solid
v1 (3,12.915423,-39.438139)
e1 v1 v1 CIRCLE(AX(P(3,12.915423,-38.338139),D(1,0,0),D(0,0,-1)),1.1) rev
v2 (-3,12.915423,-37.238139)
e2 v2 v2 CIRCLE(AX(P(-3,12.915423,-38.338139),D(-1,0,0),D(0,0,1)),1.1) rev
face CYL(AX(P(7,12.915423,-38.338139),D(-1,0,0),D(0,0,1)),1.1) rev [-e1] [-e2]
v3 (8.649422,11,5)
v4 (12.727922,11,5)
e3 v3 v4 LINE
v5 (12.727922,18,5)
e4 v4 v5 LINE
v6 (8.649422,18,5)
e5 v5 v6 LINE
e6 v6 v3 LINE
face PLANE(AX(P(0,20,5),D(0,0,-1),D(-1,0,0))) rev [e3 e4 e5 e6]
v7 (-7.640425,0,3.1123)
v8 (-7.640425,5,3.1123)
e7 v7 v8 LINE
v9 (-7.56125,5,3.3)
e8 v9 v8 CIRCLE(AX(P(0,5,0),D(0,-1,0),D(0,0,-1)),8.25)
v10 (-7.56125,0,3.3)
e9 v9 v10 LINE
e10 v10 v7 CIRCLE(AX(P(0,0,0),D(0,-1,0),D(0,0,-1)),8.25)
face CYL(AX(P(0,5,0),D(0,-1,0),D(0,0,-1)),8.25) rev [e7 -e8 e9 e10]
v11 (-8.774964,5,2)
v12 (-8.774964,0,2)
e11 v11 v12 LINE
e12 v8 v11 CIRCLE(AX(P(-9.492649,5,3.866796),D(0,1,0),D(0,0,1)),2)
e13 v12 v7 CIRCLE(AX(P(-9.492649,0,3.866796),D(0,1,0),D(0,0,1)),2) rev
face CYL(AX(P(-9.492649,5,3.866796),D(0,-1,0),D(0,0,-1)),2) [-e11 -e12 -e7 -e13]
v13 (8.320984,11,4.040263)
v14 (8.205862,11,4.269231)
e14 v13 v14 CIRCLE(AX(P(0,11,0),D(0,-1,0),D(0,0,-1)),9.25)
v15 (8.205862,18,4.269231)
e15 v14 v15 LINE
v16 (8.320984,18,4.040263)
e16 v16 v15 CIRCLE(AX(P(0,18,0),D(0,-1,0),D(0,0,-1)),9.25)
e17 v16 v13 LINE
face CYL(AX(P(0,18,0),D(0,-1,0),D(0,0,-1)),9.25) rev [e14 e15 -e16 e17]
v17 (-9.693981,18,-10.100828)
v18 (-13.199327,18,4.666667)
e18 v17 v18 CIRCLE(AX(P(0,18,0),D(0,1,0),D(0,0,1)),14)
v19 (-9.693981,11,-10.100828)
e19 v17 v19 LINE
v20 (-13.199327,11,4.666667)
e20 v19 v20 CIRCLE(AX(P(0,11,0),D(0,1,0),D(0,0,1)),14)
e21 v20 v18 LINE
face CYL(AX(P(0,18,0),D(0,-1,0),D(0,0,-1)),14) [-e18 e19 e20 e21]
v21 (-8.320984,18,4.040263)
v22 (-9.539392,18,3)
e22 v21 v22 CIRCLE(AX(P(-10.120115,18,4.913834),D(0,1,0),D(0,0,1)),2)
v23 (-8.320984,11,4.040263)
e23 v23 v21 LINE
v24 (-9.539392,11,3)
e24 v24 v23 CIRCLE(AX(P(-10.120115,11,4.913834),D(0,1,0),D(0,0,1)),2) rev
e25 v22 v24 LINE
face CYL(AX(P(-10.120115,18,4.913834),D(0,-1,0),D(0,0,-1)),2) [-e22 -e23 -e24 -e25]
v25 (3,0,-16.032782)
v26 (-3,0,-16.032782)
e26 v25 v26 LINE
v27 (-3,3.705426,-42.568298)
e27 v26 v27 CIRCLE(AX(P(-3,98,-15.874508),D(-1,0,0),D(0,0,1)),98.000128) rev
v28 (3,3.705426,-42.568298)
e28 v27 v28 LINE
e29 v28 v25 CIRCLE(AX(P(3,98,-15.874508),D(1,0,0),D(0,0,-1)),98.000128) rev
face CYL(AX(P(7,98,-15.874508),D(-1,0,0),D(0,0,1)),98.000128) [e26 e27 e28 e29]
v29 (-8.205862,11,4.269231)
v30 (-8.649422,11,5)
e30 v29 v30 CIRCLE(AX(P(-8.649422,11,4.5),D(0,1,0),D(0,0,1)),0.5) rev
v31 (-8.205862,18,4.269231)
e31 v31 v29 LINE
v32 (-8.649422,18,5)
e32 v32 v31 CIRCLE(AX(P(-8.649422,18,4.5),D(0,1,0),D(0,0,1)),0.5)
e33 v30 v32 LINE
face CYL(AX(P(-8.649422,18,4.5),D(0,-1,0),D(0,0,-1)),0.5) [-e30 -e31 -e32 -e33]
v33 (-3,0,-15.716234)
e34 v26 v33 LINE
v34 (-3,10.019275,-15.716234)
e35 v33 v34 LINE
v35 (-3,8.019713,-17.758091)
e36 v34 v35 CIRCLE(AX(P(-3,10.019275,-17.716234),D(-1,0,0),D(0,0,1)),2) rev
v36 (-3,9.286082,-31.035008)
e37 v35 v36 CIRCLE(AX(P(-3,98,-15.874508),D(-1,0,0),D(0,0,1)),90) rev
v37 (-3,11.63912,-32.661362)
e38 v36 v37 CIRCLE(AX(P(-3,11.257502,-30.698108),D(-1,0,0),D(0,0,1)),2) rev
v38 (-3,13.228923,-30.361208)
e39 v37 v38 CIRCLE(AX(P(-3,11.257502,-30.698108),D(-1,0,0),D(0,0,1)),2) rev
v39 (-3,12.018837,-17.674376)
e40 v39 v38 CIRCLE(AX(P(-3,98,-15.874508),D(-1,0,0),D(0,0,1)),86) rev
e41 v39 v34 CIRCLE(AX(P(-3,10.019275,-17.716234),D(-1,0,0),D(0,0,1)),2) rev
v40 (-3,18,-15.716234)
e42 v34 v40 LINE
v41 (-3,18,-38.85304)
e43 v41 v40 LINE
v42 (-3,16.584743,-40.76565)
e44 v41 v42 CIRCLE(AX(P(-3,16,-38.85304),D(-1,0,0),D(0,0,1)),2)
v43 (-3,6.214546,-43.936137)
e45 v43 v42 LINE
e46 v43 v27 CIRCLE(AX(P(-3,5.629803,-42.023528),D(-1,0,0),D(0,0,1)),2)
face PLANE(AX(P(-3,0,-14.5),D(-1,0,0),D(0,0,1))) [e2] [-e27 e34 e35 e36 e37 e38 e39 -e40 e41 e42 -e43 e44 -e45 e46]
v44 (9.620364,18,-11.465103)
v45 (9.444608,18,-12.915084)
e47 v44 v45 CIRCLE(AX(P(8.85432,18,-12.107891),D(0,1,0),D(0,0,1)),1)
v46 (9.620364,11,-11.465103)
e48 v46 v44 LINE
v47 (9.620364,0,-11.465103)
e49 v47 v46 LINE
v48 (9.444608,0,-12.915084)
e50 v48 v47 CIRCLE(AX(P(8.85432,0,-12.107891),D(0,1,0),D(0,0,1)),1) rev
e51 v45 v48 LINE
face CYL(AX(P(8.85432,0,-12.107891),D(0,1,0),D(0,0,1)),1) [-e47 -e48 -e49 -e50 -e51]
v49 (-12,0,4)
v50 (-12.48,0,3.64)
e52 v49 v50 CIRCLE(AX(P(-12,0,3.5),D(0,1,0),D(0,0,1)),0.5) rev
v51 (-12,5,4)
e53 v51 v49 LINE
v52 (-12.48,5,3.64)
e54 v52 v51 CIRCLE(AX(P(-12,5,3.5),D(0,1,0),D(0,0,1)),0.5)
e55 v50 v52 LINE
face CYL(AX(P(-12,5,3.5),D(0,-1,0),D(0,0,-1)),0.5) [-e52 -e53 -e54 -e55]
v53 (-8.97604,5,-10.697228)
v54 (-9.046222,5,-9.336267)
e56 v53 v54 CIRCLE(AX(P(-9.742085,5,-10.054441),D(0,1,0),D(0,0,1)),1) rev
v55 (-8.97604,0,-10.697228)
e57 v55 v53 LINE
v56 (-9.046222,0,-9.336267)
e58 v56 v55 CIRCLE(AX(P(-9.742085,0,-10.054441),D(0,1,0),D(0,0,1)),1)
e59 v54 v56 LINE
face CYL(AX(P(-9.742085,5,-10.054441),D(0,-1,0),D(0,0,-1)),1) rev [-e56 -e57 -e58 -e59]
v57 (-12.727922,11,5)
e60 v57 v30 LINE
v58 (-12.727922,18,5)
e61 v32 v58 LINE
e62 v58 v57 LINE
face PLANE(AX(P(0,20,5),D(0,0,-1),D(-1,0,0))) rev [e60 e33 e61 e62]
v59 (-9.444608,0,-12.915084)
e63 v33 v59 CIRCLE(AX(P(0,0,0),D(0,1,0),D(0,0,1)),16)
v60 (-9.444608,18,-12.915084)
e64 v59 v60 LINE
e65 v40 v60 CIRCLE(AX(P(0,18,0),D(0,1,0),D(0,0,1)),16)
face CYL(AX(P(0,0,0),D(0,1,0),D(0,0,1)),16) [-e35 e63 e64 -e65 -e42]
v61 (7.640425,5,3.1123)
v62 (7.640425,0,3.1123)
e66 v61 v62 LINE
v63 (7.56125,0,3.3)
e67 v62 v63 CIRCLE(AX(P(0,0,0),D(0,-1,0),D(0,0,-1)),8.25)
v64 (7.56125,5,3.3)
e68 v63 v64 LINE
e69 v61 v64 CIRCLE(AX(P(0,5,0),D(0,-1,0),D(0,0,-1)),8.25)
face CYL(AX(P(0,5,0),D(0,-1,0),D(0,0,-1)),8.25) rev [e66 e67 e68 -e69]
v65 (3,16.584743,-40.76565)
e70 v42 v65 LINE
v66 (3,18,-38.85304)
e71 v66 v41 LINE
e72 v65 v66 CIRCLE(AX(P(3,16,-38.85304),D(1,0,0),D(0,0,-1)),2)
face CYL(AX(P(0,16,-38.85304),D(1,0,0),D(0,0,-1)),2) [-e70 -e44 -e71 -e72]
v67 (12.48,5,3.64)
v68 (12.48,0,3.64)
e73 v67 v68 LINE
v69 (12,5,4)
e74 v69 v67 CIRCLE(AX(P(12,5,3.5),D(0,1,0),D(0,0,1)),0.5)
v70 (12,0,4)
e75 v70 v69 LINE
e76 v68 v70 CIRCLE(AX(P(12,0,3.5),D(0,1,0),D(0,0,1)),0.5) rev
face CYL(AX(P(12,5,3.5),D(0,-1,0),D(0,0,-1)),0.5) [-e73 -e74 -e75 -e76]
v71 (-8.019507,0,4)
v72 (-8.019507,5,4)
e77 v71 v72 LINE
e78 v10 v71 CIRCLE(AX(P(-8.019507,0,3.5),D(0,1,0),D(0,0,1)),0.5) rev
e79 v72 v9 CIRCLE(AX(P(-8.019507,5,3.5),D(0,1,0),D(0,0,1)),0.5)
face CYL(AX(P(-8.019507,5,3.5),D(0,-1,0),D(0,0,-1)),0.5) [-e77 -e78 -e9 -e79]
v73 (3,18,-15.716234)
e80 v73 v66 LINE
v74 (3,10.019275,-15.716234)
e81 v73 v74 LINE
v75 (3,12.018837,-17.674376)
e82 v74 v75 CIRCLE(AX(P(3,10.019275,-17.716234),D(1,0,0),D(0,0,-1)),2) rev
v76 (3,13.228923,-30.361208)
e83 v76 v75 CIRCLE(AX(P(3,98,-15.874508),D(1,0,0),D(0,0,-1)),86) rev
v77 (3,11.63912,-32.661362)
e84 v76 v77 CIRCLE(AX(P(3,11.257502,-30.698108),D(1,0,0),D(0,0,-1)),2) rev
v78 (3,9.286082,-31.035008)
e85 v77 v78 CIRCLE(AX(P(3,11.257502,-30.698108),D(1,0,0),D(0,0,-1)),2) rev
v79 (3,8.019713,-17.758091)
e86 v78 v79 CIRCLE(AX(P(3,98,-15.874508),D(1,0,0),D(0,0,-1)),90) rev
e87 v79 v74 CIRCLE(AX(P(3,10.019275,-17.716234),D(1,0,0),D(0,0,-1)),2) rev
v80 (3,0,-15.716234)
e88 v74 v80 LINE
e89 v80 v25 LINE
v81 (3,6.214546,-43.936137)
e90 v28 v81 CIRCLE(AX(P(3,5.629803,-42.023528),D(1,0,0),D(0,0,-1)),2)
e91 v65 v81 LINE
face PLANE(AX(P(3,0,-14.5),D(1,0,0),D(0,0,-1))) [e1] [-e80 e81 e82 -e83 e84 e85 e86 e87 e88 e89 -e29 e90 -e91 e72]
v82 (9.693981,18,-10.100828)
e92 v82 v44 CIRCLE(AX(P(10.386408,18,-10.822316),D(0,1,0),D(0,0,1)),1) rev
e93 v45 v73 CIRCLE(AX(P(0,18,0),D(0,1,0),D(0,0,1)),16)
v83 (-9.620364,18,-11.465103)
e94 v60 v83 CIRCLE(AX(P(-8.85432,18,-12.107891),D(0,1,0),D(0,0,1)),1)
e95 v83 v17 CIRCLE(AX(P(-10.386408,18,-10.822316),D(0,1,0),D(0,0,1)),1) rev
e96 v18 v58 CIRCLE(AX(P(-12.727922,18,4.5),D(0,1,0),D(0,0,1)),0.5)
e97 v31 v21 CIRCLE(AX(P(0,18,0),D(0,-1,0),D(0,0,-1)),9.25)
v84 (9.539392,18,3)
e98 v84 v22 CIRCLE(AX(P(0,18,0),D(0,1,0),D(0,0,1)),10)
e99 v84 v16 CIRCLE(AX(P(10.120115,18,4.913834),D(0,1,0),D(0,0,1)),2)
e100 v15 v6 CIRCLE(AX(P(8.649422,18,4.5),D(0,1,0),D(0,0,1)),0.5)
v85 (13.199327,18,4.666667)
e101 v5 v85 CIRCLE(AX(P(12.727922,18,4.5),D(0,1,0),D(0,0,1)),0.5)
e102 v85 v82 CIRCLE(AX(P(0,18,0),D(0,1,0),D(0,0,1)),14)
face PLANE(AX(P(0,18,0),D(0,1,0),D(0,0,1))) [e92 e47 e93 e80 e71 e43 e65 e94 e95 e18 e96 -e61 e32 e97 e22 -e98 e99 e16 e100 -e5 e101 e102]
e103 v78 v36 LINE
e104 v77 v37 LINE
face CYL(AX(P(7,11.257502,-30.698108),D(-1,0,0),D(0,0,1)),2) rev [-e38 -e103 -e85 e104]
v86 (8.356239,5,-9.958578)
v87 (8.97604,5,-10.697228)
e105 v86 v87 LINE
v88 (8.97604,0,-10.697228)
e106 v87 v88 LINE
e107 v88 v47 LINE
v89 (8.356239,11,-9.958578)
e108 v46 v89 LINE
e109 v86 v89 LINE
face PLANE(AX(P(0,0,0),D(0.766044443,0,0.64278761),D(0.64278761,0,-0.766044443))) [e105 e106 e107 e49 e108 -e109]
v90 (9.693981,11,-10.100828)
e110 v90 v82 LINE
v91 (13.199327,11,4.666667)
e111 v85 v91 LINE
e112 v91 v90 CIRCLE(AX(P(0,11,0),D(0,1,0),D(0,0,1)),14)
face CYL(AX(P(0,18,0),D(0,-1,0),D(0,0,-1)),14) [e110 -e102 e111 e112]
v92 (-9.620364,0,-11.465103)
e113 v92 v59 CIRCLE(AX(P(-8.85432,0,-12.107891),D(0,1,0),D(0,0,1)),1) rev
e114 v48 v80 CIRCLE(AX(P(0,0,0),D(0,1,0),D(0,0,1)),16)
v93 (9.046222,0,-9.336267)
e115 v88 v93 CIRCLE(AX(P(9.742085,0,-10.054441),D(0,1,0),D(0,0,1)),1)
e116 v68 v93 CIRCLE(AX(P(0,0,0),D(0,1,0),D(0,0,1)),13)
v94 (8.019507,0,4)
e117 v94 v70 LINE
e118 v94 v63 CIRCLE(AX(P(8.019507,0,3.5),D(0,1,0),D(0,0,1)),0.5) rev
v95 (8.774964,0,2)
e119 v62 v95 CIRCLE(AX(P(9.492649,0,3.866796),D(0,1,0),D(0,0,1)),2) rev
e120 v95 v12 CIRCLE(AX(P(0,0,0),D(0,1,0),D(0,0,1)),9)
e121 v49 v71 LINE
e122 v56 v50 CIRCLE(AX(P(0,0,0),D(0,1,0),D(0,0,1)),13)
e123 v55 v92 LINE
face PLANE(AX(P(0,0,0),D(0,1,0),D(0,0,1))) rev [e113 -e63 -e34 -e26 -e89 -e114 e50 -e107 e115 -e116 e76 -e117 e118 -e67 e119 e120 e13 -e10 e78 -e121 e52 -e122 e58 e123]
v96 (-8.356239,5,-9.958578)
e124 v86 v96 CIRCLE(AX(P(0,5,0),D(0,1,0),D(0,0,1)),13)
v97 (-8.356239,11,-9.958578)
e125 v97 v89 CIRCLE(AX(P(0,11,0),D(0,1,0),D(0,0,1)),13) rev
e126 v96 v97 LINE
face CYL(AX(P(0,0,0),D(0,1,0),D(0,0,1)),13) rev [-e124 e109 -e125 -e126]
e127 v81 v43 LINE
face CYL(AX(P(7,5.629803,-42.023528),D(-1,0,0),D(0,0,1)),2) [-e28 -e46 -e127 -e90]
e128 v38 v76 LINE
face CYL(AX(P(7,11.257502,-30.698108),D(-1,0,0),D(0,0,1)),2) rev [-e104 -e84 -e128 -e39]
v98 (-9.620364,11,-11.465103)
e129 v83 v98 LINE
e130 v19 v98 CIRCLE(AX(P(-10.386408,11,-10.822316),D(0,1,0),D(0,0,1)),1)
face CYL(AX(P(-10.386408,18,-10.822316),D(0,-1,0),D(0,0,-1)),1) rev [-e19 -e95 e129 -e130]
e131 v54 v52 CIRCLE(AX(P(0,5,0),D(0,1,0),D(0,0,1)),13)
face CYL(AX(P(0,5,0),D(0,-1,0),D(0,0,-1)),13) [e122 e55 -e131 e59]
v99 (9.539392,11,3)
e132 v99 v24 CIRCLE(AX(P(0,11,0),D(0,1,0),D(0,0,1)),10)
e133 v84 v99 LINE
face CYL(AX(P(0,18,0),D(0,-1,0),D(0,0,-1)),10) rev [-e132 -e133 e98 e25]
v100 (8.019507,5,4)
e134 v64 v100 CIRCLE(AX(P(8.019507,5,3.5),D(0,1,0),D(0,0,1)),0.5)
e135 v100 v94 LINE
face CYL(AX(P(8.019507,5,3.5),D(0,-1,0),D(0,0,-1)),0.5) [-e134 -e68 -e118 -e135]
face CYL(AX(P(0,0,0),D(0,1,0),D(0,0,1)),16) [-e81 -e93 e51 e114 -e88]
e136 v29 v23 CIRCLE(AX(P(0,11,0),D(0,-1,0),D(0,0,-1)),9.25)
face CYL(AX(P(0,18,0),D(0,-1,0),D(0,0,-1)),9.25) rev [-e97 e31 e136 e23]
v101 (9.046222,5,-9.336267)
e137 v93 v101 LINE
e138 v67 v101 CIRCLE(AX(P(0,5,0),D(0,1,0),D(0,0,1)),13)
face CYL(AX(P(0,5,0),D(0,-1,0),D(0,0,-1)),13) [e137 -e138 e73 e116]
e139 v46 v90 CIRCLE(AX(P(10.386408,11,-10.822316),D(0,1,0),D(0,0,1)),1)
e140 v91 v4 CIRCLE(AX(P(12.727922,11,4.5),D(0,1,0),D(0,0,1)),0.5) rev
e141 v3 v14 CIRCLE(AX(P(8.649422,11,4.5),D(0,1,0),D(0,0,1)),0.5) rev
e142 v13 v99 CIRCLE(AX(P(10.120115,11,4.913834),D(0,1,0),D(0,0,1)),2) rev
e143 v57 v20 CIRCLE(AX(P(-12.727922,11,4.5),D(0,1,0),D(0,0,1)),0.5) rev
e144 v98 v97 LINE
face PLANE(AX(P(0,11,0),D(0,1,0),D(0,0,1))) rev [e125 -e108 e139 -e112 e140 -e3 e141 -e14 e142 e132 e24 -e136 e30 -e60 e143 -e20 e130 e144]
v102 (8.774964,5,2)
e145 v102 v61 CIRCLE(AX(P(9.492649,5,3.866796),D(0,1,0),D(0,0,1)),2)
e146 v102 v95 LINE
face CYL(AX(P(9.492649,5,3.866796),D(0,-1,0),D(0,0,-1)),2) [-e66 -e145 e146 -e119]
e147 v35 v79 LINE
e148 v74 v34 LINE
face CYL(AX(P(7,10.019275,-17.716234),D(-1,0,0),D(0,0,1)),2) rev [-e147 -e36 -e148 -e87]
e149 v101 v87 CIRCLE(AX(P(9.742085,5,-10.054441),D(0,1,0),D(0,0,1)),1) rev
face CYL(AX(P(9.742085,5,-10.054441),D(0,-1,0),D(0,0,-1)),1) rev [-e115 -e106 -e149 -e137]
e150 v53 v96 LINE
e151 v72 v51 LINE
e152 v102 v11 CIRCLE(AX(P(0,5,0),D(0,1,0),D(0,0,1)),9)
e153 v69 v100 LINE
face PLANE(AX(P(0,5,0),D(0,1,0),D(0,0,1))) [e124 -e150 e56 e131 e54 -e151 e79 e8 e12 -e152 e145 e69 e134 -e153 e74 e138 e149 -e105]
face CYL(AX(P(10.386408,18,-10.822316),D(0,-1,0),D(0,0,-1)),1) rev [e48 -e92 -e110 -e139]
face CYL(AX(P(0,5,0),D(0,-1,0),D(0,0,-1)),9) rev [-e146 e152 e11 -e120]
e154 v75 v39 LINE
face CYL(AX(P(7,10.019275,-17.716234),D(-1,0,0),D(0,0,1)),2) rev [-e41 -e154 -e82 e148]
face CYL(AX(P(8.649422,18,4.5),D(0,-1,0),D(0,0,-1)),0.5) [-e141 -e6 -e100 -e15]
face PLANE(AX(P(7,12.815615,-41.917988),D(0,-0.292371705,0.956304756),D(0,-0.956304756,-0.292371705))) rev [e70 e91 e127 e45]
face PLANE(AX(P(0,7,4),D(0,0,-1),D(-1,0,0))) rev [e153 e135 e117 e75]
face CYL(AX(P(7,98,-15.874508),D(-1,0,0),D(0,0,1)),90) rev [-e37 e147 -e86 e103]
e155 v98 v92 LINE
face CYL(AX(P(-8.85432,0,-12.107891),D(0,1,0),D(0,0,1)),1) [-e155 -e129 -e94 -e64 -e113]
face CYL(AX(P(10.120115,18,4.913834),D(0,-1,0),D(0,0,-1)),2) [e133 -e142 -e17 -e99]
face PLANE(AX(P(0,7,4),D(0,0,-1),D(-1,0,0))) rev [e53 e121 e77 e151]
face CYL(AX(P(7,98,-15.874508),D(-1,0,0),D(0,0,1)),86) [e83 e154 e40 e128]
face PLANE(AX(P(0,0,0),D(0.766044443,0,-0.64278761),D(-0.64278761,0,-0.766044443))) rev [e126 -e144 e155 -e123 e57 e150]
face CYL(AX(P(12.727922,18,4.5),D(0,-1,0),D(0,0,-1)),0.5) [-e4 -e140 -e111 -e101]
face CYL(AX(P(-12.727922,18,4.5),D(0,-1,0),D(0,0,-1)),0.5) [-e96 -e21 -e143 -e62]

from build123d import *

# Parameters (mm, degrees)
SKETCH1_R              = 13
SKETCH1_R_2            = 9
BOSS_EXTRUDE1_DEPTH    = 5
SKETCH2_R              = 14
SKETCH2_R_2            = 10
BOSS_EXTRUDE2_DEPTH    = 7
CUT_EXTRUDE1_DEPTH     = 7
BOSS_EXTRUDE3_DEPTH    = 5
FILLET1_R              = 2
FILLET2_R              = 0.5
CUT_EXTRUDE2_DEPTH     = 9
BOSS_EXTRUDE4_DEPTH    = 7
FILLET3_R              = 2
FILLET4_R              = 0.5
BOSS_EXTRUDE5_START    = -18
BOSS_EXTRUDE5_DEPTH    = 18
BOSS_EXTRUDE6_START    = -18
BOSS_EXTRUDE6_DEPTH    = 18
SKETCH7_W              = 6
SKETCH7_H              = 18
BOSS_EXTRUDE7_DEPTH    = 28
FILLET5_R              = 1
CUT_EXTRUDE3_START     = -6
CUT_EXTRUDE3_OUTLINE_R = 1.1
CUT_EXTRUDE3_DEPTH     = 6
FILLET7_R              = 2


# Read off the part's stored shape, not the designer's step: Boss-Extrude6, Cut-Extrude3
# Some blends are built 0.0001 mm under size
with BuildPart() as part:
    # Sketch1 → Boss-Extrude1 (new body)
    with BuildSketch(Plane(origin=(0, 0, 0), x_dir=(1, 0, 0), z_dir=(0, 1, 0))):
        with Locations(Location((0, 0, 0), (0, 0, 270))):
            Circle(SKETCH1_R)
        with Locations(Location((0, 0, 0), (0, 0, 270))):
            Circle(SKETCH1_R_2, mode=Mode.SUBTRACT)
    extrude(amount=BOSS_EXTRUDE1_DEPTH)

    # Sketch3 → Cut-Extrude1 (cut)
    with BuildSketch(Plane.XZ):
        with BuildLine():
            ThreePointArc((12.369316877, 4), (0, 13), (-12.369316877, 4))
            Line((-12.369316877, 4), (-8.062257748, 4))
            ThreePointArc((-8.062257748, 4), (0, 9), (8.062257748, 4))
            Line((8.062257748, 4), (12.369316877, 4))
        make_face()
    extrude(amount=-CUT_EXTRUDE1_DEPTH, mode=Mode.SUBTRACT)

    # Sketch3<3> → Boss-Extrude3 (add)
    with BuildSketch(Plane.XZ):
        with BuildLine():
            Line((-7.215434845, 4), (-8.062257748, 4))
            ThreePointArc((-8.062257748, 4), (-8.477795251, 3.02109048), (-8.774964387, 2))
            Line((-8.774964387, 2), (-8.003905297, 2))
            ThreePointArc((-8.003905297, 2), (-7.675094696, 3.025792692), (-7.215434845, 4))
        make_face()
        with BuildLine():
            ThreePointArc((8.774964387, 2), (8.477795251, 3.02109048), (8.062257748, 4))
            Line((8.062257748, 4), (7.215434845, 4))
            ThreePointArc((7.215434845, 4), (7.675094696, 3.025792692), (8.003905297, 2))
            Line((8.003905297, 2), (8.774964387, 2))
        make_face()
    extrude(amount=-BOSS_EXTRUDE3_DEPTH)

    # Fillet1
    # the kernel refuses this fillet: 2 mm, written as the material it takes off along each edge
    with BuildSketch(Plane(origin=(8.003905297, -2.925457541, 2), x_dir=(-0.3106184744402921, 0, 0.9505346723483502), z_dir=(0, 1, 0))) as fillet1_piece_1:
        with BuildLine():
            CenterArc((1.312023382, 1.994963987), FILLET1_R, 219.12562277, 46.807536055)
            Line((-0.239505198, 0.7329184), (-0.27053577, 0.707677488))
            ThreePointArc((-0.27053577, 0.707677488), (-0.157773986, 0.354034461), (-0.038021387, -0.012424739))
            Line((-0.038021387, -0.012424739), (0.002836807, -0.03989928))
            ThreePointArc((0.002836807, -0.03989928), (0.585091508, -0.019226448), (1.167346209, -0.03989928))
            Line((1.167346209, -0.03989928), (1.170183016, 0))
        make_face()
    extrude(amount=10.850915082, mode=Mode.SUBTRACT)
    with BuildSketch(Plane(origin=(-8.003905297, -2.925457541, 2), x_dir=(-1, 0, 0), z_dir=(0, 1, 0))) as fillet1_piece_2:
        with BuildLine():
            CenterArc((1.488743739, 1.866796386), FILLET1_R, 202.16334775, 46.807536055)
            Line((-0.363480463, 1.11229953), (-0.400524947, 1.097209593))
            ThreePointArc((-0.400524947, 1.097209593), (-0.200015637, 0.550177675), (-0.038806814, -0.00969697))
            Line((-0.038806814, -0.00969697), (0, -0.04))
            ThreePointArc((0, -0.04), (0.385529545, -0.04), (0.756705398, -0.037335928))
            Line((0.756705398, -0.037335928), (0.771059091, 0))
        make_face()
    extrude(amount=10.850915082, mode=Mode.SUBTRACT)

    # Fillet2
    fillet2_edges = [part.edges().sort_by_distance(p)[0] for p in [
        (-12.369316877, 2.5, 4),
        (12.369316877, 2.5, 4),
        (-7.215434845, 2.5, 4),
        (7.215434845, 2.5, 4),
    ]]
    fillet(fillet2_edges, radius=FILLET2_R)



with BuildPart() as body_2:
    # Sketch2 → Boss-Extrude2 (new body)
    with BuildSketch(Plane(origin=(0, 11, 0), x_dir=(1, 0, 0), z_dir=(0, 1, 0))):
        with Locations(Location((0, 0, 0), (0, 0, 270))):
            Circle(SKETCH2_R)
        with Locations(Location((0, 0, 0), (0, 0, 270))):
            Circle(SKETCH2_R_2, mode=Mode.SUBTRACT)
    extrude(amount=BOSS_EXTRUDE2_DEPTH)

    # Sketch4 → Cut-Extrude2 (cut)
    with BuildSketch(Plane.XZ.offset(-11)):
        with BuildLine():
            ThreePointArc((13.076696831, 5), (0, 14), (-13.076696831, 5))
            Line((-13.076696831, 5), (-8.660254038, 5))
            ThreePointArc((-8.660254038, 5), (0, 10), (8.660254038, 5))
            Line((8.660254038, 5), (13.076696831, 5))
        make_face()
    extrude(amount=-CUT_EXTRUDE2_DEPTH, mode=Mode.SUBTRACT)

    # Sketch4<3> → Boss-Extrude4 (add)
    with BuildSketch(Plane.XZ.offset(-11)):
        with BuildLine():
            Line((-7.782191208, 5), (-8.660254038, 5))
            ThreePointArc((-8.660254038, 5), (-9.154604257, 4.02408013), (-9.539392014, 3))
            Line((-9.539392014, 3), (-8.75, 3))
            ThreePointArc((-8.75, 3), (-8.326363944, 4.029164115), (-7.782191208, 5))
        make_face()
        with BuildLine():
            ThreePointArc((9.539392014, 3), (9.154604257, 4.02408013), (8.660254038, 5))
            Line((8.660254038, 5), (7.782191208, 5))
            ThreePointArc((7.782191208, 5), (8.326363944, 4.029164115), (8.75, 3))
            Line((8.75, 3), (9.539392014, 3))
        make_face()
    extrude(amount=-BOSS_EXTRUDE4_DEPTH)

    # Fillet3
    # the kernel refuses this fillet: 2 mm, written as the material it takes off along each edge
    with BuildSketch(Plane(origin=(-8.75, 8.186857883, 3), x_dir=(-1, 0, 0), z_dir=(0, 1, 0))) as fillet3_piece_1:
        with BuildLine():
            CenterArc((1.370115418, 1.913833934), FILLET3_R, 205.898945897, 47.221442291)
            Line((-0.429016212, 1.040263457), (-0.464998845, 1.022792048))
            ThreePointArc((-0.464998845, 1.022792048), (-0.235653724, 0.511411041), (-0.037837838, -0.012972973))
            Line((-0.037837838, -0.012972973), (0, -0.04))
            ThreePointArc((0, -0.04), (0.394696007, -0.04), (0.777777546, -0.038276679))
            Line((0.777777546, -0.038276679), (0.789392014, 0))
        make_face()
    extrude(amount=12.626284233, mode=Mode.SUBTRACT)
    with BuildSketch(Plane(origin=(8.75, 8.186857883, 3), x_dir=(-0.3812606993131178, 0, 0.9244675652283711), z_dir=(0, 1, 0))) as fillet3_piece_2:
        with BuildLine():
            CenterArc((1.246906235, 1.996296928), FILLET3_R, 219.291406968, 47.221442291)
            Line((-0.300964151, 0.729767313), (-0.331921559, 0.704436721))
            ThreePointArc((-0.331921559, 0.704436721), (-0.187460778, 0.349633229), (-0.036978703, -0.015250428))
            Line((-0.036978703, -0.015250428), (0.002432988, -0.039925939))
            ThreePointArc((0.002432988, -0.039925939), (0.562628423, -0.022873294), (1.122823859, -0.039925939))
            Line((1.122823859, -0.039925939), (1.125256847, 0))
        make_face()
    extrude(amount=12.626284233, mode=Mode.SUBTRACT)

    # Fillet4
    fillet4_edges = [body_2.edges().sort_by_distance(p)[0] for p in [
        (-13.076696831, 14.5, 5),
        (13.076696831, 14.5, 5),
        (-7.782191208, 14.5, 5),
        (7.782191208, 14.5, 5),
    ]]
    fillet(fillet4_edges, radius=FILLET4_R)


with BuildPart() as part_1:
    add(part.part)

    add(body_2.part)  # Boss-Extrude5 merges body 2
    # Sketch5 → Boss-Extrude5 (add)
    with BuildSketch(Plane(origin=(0, 18, 0), x_dir=(1, 0, 0), z_dir=(0, 1, 0)).offset(BOSS_EXTRUDE5_START)):
        with BuildLine():
            ThreePointArc((0, 14), (4.788282007, 13.155696691), (8.999026536, 10.724622204))
            Line((8.999026536, 10.724622204), (10.284601755, 12.25671109))
            ThreePointArc((10.284601755, 12.25671109), (0, 16), (-10.284601755, 12.25671109))
            Line((-10.284601755, 12.25671109), (-8.999026536, 10.724622204))
            ThreePointArc((-8.999026536, 10.724622204), (-4.788282007, 13.155696691), (0, 14))
        make_face()
        with BuildLine():
            ThreePointArc((0, 13), (4.446261863, 12.21600407), (8.356238926, 9.958577761))
            Line((8.356238926, 9.958577761), (8.999026536, 10.724622204))
            ThreePointArc((8.999026536, 10.724622204), (4.788282007, 13.155696691), (0, 14))
            Line((0, 14), (0, 13))
        make_face()
        with BuildLine():
            Line((-8.999026536, 10.724622204), (-8.356238926, 9.958577761))
            ThreePointArc((-8.356238926, 9.958577761), (-4.446261863, 12.21600407), (0, 13))
            Line((0, 13), (0, 14))
            ThreePointArc((0, 14), (-4.788282007, 13.155696691), (-8.999026536, 10.724622204))
        make_face()
    extrude(amount=BOSS_EXTRUDE5_DEPTH)

    # Boss-Extrude6 outline → Boss-Extrude6 (add)
    with BuildSketch(Plane(origin=(0, 18, 0), x_dir=(1, 0, 0), z_dir=(0, 1, 0)).offset(BOSS_EXTRUDE6_START)):
        with BuildLine():
            ThreePointArc((-3, 15.716233646), (0, 16), (3, 15.716233646))
            Line((3, 15.716233646), (3, 17.5))
            Line((3, 17.5), (-3, 17.5))
            Line((-3, 17.5), (-3, 15.716233646))
        make_face()
    extrude(amount=BOSS_EXTRUDE6_DEPTH)

    # Sketch7 → Boss-Extrude7 (add)
    with BuildSketch(Plane(origin=(0, 0, -17.5), x_dir=(-1, 0, 0), z_dir=(0, 0, -1))):
        with Locations((0, 9)):
            Rectangle(SKETCH7_W, SKETCH7_H)
    extrude(amount=BOSS_EXTRUDE7_DEPTH)

    # Fillet5
    fillet5_edges = [part_1.edges().sort_by_distance(p)[0] for p in [
        (-8.356238926, 2.5, -9.958577761),
        (-8.999026536, 14.5, -10.724622204),
        (8.356238926, 2.5, -9.958577761),
        (8.999026536, 14.5, -10.724622204),
        (10.284601755, 9, -12.25671109),
        (-10.284601755, 9, -12.25671109),
    ]]
    fillet(fillet5_edges, radius=FILLET5_R - 0.0001)  # a hair under: the kernel refuses the full size

    # Cut-Extrude3 outline → Cut-Extrude3 (cut)
    with BuildSketch(Plane.ZY.offset(3).offset(CUT_EXTRUDE3_START)):
        with BuildLine():
            ThreePointArc((-16.032782087, 0), (-30.438112209, 1.0880478), (-44.526972297, 4.282011691))
            Line((-44.526972297, 4.282011691), (-40.332962383, 18))
            Line((-40.332962383, 18), (-45.5, 18))
            Line((-45.5, 18), (-45.5, 0))
            Line((-45.5, 0), (-16.032782087, 0))
        make_face()
        with Locations((-38.338138622, 12.915422706)):
            Circle(CUT_EXTRUDE3_OUTLINE_R)
        with BuildLine():
            Line((-32.284081469, 13.580062224), (-33.04731745, 9.65355349))
            ThreePointArc((-33.04731745, 9.65355349), (-24.421849449, 8.406791821), (-15.716233646, 8.000139171))
            Line((-15.716233646, 8.000139171), (-15.716233646, 12.000145644))
            ThreePointArc((-15.716233646, 12.000145644), (-24.038466281, 12.388378225), (-32.284081469, 13.580062224))
        make_face()
    extrude(amount=CUT_EXTRUDE3_DEPTH, mode=Mode.SUBTRACT)

    # Fillet7
    fillet7_edges = [part_1.edges().sort_by_distance(p)[0] for p in [
        (0, 12.000145644, -15.716233646),
        (0, 8.000139171, -15.716233646),
        (0, 9.65355349, -33.04731745),
        (0, 13.580062224, -32.284081469),
        (0, 18, -40.332962383),
        (0, 4.282011691, -44.526972297),
    ]]
    fillet(fillet7_edges, radius=FILLET7_R - 0.0001)  # a hair under: the kernel refuses the full size


solid = part_1.part
